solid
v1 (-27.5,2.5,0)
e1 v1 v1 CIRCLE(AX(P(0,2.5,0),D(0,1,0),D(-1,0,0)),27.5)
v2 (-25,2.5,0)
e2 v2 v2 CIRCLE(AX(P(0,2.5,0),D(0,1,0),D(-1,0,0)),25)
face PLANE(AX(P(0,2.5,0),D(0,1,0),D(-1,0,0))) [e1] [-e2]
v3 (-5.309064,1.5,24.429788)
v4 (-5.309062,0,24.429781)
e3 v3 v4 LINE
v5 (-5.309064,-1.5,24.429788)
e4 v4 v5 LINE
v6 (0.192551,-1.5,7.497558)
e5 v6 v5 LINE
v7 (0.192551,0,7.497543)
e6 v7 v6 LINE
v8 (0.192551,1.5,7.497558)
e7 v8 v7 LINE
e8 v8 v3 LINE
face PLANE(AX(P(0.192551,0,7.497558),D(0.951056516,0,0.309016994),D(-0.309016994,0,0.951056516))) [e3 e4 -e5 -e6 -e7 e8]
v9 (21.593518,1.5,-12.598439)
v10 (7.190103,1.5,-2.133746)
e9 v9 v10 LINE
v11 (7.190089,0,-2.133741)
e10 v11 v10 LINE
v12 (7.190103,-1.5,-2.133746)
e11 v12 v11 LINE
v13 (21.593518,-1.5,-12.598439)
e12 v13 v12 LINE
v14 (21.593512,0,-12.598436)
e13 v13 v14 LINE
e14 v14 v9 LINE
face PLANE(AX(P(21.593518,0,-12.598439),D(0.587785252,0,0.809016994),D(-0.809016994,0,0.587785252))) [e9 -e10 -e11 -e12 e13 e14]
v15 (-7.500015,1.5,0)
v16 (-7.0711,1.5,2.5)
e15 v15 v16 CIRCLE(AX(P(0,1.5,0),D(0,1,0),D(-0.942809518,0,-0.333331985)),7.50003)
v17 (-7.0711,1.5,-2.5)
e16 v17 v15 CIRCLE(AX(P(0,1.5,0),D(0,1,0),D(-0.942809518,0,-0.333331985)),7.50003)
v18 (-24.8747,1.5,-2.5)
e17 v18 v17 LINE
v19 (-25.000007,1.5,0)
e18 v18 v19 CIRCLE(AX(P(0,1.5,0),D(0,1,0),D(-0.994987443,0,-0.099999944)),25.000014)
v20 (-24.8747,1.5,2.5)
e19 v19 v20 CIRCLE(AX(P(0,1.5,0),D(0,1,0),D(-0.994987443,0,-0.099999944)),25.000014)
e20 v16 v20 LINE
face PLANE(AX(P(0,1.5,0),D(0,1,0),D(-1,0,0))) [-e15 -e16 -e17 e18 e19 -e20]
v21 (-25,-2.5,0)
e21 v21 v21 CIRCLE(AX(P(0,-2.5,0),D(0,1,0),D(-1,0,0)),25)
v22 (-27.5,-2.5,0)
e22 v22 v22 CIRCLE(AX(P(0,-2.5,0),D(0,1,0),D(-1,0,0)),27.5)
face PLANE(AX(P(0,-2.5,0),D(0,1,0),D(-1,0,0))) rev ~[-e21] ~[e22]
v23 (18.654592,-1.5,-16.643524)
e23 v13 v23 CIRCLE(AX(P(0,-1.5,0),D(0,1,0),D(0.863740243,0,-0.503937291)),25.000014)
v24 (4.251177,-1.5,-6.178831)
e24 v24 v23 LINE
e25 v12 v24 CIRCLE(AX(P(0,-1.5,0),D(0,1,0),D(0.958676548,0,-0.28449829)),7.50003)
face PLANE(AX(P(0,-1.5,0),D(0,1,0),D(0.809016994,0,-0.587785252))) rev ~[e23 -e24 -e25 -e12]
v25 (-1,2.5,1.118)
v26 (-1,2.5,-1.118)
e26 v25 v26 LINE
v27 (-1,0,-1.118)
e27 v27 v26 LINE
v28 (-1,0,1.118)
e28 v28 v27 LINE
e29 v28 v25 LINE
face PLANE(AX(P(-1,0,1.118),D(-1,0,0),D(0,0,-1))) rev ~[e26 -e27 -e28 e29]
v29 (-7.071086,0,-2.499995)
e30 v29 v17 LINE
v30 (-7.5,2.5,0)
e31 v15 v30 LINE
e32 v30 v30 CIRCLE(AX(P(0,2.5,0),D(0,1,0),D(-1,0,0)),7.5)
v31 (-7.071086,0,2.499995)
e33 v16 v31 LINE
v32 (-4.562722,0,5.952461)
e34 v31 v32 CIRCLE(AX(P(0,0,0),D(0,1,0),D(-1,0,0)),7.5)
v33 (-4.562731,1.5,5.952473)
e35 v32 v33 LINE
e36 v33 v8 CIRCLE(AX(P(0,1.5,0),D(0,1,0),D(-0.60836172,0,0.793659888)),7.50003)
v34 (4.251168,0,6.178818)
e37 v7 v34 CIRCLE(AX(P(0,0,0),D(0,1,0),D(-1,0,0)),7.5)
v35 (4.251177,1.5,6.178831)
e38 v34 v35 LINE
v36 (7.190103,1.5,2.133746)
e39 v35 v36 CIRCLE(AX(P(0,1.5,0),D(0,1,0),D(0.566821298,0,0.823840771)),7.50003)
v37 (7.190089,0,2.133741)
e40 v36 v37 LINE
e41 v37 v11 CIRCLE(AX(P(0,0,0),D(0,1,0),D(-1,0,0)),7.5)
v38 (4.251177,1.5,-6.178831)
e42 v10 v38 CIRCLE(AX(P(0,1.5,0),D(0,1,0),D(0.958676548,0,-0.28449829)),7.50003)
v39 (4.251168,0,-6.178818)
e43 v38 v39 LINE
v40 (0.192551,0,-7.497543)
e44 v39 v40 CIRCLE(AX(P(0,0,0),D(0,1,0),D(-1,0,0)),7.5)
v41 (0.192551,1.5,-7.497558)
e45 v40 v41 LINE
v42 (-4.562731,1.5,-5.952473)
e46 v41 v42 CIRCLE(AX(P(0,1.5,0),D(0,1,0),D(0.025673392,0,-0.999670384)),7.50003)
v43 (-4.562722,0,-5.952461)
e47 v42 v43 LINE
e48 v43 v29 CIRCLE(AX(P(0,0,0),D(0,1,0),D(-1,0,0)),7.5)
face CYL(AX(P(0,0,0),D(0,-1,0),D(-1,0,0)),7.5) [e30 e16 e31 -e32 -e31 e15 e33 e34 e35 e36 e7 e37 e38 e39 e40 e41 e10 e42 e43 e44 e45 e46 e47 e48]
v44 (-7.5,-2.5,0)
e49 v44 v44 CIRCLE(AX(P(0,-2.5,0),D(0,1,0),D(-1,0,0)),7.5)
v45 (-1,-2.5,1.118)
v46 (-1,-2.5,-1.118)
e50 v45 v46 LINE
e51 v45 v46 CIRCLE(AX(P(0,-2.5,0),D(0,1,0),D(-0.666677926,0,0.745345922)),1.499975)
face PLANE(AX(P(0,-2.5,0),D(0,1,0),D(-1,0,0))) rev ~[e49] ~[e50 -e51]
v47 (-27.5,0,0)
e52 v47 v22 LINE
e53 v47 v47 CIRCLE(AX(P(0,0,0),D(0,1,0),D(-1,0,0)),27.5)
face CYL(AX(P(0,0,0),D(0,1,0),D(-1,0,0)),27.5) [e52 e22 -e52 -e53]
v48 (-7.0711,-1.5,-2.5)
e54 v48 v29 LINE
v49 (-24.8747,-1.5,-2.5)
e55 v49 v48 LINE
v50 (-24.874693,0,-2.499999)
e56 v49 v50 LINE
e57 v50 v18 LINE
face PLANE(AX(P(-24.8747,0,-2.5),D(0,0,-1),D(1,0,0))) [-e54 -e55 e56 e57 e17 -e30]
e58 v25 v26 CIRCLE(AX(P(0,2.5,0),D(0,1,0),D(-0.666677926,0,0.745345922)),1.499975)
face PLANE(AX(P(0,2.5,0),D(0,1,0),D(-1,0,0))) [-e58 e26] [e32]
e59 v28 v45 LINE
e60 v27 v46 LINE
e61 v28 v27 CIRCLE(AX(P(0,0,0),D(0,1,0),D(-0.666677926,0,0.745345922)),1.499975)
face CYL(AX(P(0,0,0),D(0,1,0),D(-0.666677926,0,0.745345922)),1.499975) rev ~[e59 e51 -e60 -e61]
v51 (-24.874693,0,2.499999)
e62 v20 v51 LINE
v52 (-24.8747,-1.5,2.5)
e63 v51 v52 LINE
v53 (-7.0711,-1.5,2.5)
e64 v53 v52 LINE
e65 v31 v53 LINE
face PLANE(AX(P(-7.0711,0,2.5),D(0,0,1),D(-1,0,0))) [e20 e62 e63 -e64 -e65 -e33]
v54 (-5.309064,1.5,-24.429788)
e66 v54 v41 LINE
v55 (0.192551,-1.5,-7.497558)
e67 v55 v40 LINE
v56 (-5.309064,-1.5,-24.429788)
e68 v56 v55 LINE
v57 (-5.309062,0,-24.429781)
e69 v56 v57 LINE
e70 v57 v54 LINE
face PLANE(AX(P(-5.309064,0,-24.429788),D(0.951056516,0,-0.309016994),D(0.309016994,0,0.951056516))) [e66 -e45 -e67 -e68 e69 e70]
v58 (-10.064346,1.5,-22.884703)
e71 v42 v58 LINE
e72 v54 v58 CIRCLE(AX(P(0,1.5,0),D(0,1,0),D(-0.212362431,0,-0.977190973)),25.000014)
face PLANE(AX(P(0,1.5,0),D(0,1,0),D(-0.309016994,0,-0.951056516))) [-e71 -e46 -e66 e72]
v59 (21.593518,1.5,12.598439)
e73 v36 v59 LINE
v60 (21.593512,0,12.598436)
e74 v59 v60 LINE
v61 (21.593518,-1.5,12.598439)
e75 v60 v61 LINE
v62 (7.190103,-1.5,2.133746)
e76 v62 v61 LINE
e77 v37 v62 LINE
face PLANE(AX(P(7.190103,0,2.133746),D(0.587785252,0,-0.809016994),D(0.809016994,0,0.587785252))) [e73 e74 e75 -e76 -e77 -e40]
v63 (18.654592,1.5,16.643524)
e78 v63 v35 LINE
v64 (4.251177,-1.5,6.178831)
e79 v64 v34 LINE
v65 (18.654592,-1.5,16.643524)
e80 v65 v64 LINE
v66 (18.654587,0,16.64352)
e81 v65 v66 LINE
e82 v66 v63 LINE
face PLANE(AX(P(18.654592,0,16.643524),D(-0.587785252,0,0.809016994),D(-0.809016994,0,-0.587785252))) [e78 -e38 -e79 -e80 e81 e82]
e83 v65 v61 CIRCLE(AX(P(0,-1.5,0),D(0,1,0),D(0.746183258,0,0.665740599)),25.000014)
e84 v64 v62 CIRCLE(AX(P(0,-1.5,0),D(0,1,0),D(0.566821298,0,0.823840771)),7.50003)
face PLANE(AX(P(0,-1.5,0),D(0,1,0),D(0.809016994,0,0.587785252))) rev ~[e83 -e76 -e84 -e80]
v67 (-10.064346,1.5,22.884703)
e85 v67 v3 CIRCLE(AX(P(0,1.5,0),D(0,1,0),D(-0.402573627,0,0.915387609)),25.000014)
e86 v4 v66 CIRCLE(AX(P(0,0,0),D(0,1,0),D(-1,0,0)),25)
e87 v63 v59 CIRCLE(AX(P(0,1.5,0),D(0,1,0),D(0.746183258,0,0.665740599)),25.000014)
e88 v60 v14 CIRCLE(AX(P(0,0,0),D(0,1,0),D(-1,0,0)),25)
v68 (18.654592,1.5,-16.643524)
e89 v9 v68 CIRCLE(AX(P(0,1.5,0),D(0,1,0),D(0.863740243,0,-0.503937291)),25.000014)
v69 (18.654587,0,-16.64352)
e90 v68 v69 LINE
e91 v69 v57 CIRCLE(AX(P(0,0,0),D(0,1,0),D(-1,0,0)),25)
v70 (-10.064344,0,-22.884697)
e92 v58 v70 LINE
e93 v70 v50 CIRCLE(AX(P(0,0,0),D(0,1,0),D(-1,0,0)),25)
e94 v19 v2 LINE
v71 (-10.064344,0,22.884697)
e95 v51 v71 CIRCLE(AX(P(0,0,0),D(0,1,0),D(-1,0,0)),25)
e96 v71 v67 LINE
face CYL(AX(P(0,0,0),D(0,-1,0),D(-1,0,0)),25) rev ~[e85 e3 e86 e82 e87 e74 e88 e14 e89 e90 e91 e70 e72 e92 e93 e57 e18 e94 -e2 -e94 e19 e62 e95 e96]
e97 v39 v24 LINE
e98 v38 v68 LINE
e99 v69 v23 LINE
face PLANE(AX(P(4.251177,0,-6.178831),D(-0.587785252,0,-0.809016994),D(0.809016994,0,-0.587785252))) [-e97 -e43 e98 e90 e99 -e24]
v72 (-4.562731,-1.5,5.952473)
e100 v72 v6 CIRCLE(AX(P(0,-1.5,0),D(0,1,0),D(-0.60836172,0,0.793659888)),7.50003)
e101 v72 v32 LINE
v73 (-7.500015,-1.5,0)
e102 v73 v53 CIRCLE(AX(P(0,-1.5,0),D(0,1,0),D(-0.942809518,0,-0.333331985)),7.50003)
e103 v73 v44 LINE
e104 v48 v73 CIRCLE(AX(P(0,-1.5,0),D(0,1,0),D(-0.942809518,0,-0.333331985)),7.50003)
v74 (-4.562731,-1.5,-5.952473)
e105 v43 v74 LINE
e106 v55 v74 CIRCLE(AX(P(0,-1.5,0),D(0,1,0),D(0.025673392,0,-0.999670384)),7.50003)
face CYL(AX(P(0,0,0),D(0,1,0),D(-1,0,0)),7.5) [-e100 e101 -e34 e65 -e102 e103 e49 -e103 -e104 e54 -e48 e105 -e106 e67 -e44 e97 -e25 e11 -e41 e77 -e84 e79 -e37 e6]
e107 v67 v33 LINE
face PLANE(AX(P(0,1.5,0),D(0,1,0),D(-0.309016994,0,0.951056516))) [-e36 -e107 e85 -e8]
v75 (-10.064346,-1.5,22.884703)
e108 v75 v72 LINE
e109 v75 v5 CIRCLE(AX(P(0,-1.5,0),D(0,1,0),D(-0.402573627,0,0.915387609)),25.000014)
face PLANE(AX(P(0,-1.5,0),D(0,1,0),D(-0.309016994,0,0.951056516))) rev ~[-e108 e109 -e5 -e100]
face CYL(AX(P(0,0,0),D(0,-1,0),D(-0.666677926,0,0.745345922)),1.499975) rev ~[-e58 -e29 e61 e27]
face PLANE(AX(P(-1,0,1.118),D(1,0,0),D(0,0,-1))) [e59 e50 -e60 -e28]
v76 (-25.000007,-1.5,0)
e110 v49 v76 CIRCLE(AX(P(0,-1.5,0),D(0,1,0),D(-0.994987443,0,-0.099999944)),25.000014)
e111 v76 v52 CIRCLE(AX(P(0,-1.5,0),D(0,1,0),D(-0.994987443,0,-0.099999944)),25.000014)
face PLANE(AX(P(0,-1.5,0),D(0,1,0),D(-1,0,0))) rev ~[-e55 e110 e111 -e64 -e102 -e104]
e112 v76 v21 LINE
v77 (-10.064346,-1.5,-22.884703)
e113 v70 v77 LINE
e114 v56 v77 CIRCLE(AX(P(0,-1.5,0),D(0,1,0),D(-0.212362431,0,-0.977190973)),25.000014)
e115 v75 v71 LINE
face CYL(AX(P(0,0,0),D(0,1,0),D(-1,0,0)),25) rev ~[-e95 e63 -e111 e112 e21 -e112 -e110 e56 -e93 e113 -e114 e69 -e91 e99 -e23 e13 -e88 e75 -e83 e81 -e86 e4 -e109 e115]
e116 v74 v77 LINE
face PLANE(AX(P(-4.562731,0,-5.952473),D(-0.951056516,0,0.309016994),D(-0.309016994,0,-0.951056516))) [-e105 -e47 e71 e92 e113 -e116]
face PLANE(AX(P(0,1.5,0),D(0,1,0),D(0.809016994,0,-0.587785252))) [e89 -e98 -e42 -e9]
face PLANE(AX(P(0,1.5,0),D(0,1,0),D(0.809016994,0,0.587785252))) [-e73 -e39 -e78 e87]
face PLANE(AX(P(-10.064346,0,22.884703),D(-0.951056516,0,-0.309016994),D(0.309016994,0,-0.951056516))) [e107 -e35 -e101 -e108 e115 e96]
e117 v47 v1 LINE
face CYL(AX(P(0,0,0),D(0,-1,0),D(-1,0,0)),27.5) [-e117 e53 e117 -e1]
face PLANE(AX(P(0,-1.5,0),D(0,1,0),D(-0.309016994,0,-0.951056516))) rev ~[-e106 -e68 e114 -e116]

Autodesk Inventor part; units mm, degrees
ref_plane "YZ Plane" through (0, 0, 0) normal (1, 0, 0) x (0, 1, 0)
ref_plane "XZ Plane" through (0, 0, 0) normal (0, 1, 0) x (-1, 0, 0)
ref_plane "XY Plane" through (0, 0, 0) normal (0, 0, 1) x (1, 0, 0)
sketch "Boceto1" plane through (0, 0, 0) normal (0, 1, 0) x (-1, 0, 0)
  circle A0 centre (0, 0) radius 27.5
  circle A1 centre (0, 0) radius 25
  circle A2 centre (0, 0) radius 7.5
  arc A3 (1, 1.118) -> (1, -1.118) centre (0, 0) ccw
  line L0 (1, 1.118) -> (1, -1.118)
  dimension "d0" = 55
  dimension "d1" = 50
  dimension "d2" = 15
  dimension "d3" = 3
  dimension "d6" = 1
extrude "Extrusión1" add sketch "Boceto1" along normal mid plane 5
sketch "Boceto2" plane through (0, 0, 0) normal (0, 1, 0) x (-1, 0, 0)
  arc A0 (7.0711, -2.5) -> (7.0711, 2.5) centre (0, 0) ccw
  arc A1 (24.8747, -2.5) -> (24.8747, 2.5) centre (0, 0) ccw
  line L0 (7.0711, 2.5) -> (24.8747, 2.5)
  line L1 (24.8747, -2.5) -> (7.0711, -2.5)
  dimension "d9" = 15
  dimension "d10" = 50
  dimension "d12" = 2.5
extrude "Extrusión2" add sketch "Boceto2" along normal mid plane 3
pattern_circular "Patrón circular1" count 5 over 360 about axis through (0, -10, 0) along (0, 1, 0) of "Extrusión2"
properties part number "Rueda"
